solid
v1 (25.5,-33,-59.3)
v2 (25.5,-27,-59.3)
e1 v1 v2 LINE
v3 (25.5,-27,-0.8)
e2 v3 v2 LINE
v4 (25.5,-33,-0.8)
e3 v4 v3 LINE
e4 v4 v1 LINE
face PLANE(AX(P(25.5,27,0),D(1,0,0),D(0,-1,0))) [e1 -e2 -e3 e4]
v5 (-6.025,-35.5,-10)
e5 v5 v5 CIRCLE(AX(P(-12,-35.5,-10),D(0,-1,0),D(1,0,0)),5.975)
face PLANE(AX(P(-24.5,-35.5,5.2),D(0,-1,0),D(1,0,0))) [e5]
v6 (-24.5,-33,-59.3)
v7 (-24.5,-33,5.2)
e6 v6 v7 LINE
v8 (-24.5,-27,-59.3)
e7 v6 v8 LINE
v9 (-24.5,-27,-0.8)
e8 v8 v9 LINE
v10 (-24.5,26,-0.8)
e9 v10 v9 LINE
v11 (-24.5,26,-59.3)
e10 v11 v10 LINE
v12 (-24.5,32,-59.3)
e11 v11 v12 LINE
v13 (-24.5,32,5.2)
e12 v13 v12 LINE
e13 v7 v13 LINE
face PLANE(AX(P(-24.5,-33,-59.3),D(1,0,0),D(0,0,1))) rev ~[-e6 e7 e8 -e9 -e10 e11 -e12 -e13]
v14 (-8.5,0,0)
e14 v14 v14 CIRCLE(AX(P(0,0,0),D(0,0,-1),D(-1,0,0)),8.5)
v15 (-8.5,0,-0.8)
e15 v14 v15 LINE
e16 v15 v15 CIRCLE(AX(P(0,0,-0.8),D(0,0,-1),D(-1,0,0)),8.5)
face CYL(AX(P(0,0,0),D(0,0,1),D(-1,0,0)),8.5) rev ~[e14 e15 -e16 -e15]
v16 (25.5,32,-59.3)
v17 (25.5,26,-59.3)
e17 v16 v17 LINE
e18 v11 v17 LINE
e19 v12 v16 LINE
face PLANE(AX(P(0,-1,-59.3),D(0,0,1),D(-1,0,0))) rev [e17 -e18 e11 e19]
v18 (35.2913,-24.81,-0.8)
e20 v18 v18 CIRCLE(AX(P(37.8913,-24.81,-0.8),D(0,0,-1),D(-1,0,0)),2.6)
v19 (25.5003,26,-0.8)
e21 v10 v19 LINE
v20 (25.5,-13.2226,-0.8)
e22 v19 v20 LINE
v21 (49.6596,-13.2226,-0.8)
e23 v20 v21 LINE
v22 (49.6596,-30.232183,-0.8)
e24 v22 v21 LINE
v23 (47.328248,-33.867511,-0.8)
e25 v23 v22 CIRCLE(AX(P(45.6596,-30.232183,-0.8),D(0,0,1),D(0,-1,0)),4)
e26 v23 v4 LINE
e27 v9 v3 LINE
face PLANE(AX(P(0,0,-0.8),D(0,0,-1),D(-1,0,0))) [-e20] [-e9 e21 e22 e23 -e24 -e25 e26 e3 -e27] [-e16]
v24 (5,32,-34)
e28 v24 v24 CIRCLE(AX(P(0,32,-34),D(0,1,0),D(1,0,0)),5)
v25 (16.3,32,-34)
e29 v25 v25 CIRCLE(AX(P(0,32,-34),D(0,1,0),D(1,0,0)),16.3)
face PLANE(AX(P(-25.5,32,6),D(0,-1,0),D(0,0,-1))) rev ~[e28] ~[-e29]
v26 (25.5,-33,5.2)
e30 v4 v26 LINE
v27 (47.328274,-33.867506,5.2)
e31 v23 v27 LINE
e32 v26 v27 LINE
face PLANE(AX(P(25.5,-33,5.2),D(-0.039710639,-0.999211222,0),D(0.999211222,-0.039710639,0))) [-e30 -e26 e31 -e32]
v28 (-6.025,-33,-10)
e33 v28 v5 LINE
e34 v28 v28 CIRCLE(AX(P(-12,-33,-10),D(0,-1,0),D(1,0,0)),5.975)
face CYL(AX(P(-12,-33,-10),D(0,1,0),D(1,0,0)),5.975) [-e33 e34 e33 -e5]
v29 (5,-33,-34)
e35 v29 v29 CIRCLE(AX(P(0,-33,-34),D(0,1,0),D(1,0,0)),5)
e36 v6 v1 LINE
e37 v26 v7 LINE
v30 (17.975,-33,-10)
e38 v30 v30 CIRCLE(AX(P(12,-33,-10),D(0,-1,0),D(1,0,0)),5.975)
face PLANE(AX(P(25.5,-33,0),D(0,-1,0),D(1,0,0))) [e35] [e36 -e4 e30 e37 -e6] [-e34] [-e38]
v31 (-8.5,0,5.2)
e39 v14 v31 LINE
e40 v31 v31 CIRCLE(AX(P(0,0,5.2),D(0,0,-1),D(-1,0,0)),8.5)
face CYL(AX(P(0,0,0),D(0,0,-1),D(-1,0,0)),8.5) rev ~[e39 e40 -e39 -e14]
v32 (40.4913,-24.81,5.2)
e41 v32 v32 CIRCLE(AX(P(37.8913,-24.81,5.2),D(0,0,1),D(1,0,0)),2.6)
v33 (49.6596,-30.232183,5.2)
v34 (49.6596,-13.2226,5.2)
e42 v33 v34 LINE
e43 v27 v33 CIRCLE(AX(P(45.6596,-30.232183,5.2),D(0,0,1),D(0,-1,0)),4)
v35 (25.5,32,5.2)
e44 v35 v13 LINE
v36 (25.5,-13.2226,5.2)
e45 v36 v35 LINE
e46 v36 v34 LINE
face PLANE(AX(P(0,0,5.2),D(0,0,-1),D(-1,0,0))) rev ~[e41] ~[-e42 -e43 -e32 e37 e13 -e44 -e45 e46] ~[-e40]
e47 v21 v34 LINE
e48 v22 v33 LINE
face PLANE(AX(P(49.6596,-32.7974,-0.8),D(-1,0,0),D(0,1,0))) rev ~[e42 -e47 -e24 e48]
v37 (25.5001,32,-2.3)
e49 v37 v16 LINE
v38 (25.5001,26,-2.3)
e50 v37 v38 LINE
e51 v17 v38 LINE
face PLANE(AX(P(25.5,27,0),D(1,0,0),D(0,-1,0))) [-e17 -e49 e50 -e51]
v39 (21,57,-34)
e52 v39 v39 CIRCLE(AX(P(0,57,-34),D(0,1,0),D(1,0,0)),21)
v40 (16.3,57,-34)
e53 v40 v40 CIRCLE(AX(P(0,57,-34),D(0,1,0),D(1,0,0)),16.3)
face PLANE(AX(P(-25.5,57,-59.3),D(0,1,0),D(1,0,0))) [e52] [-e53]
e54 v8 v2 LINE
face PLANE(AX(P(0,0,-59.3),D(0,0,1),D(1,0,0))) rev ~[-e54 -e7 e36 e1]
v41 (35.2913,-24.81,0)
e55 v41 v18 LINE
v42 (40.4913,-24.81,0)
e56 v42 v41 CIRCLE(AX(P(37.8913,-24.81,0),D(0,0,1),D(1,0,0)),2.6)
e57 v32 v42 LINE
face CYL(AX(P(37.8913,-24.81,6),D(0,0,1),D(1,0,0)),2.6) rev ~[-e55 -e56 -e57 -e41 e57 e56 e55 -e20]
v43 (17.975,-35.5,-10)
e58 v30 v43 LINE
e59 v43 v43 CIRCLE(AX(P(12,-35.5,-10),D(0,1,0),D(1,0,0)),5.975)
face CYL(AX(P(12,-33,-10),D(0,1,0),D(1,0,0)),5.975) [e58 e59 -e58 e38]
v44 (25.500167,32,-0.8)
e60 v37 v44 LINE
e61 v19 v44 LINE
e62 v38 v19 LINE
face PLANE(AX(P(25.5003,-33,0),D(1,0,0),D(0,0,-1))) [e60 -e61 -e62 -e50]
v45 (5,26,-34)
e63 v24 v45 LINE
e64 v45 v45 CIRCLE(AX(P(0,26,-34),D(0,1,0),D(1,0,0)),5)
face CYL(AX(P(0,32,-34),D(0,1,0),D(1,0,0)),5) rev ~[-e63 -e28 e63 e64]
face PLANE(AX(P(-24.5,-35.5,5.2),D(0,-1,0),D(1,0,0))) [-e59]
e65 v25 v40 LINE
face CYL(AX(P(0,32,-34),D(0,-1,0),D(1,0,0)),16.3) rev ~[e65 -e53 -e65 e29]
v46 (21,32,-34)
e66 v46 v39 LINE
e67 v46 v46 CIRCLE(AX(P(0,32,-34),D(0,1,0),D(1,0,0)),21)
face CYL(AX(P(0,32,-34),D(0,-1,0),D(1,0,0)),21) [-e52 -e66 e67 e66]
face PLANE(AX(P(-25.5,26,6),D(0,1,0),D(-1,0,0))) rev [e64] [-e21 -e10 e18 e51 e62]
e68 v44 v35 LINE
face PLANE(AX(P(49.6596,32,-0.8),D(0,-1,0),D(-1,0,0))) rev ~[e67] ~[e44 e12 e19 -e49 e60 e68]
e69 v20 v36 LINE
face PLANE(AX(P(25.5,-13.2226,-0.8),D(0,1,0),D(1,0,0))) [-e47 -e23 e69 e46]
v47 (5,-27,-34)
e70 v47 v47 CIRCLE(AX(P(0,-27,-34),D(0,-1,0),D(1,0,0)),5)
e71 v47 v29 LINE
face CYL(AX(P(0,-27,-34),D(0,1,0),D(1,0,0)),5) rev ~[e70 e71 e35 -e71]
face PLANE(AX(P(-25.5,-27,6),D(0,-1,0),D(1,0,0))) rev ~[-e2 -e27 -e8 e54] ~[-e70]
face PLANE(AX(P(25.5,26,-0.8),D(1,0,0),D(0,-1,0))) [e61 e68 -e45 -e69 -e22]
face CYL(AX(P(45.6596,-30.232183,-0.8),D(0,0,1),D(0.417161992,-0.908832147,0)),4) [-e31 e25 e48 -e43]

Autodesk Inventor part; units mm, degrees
sketch "Sketch1" plane through (0, 0, 0) normal (0, 0, 1) x (1, 0, 0)
  line L0 (25.5, -27) -> (-25.5, -27)
  line L1 (-25.5, -27) -> (-25.5, 27)
  line L2 (-25.5, 27) -> (25.5, 27)
  line L3 (25.5, 27) -> (25.5, -27)
  line L4 (25.5, -27) -> (-25.5, 27) construction
  line L5 (-25.5, -27) -> (25.5, 27) construction
  point P0 (0, 0)
  dimension "d0" = 51
  dimension "d1" = 54
extrude "Extrusion1" add sketch "Sketch1" along normal blind 6
sketch "Sketch2" plane through (0, 0, 6) normal (0, 0, 1) x (1, 0, 0)
  circle A0 centre (0, 0) radius 15
  dimension "d4" = 30
sketch "Sketch4" plane through (0, 0, 6) normal (0, 0, 1) x (1, 0, 0)
  line L0 (-25.5, 27) -> (26.5, 27)
  line L1 (-25.5, -27) -> (25.5, -27) projected
  line L2 (25.5, -27) -> (-25.5, -27)
  line L3 (-25.5, -27) -> (-25.5, -33)
  line L4 (-25.5, -33) -> (25.5, -33)
  line L5 (25.5, -33) -> (25.5, -27)
  point P0 (0, 0)
  dimension "d109" = 51
  dimension "d110" = 6
extrude "Extrusion4" add sketch "Sketch4" against normal blind 65.3
ref_plane "Plano de trabajo8" through (25.5, -33.8, -42) normal (1, 0, 0) x (0, 0, -1)
ref_plane "Work Plane9" through (-10.5, -27, -57) normal (0, 1, 0) x (1, 0, 0)
sketch "Sketch25" plane through (-10.5, -27, -57) normal (0, 1, 0) x (1, 0, 0)
  line L0 (0, 0) -> (21, 0) projected
  line L1 (10.5, 0) -> (10.5, -23)
  circle A0 centre (10.5, -23) radius 5
  line L2 (10.5, -23) -> (10.5, -63)
  line L3 (36, -63) -> (-15, -63) projected
  point P0 (10.5, -57)
  dimension "d111" = 23
  dimension "d112" = 10
extrude "Extrusion22" cut sketch "Sketch25" against normal blind 68
ref_plane "Work Plane7" through (-10.5, -0.5, -57) normal (0, 1, 0) x (1, 0, 0)
mirror "Mirror2" about plane through (-10.5, -0.5, -57) normal (0, 1, 0) of "Extrusion4"
extrude "Extrusión28" cut sketch "Sketch2" against normal blind 10
ref_plane "Work Plane10" through (25.5, -34, -42) normal (1, 0, 0) x (0, 0, -1)
ref_plane "Work Plane11" through (-25.5, -87, 1.3) normal (0, 1, 0) x (1, 0, 0)
sketch "Sketch37" plane through (-25.5, 32, 6) normal (0, 1, 0) x (1, 0, 0)
  circle A0 centre (25.5, 40) radius 5 projected
  point P0 (25.5, 6)
extrude "Extrusion33" cut sketch "Sketch37" against normal blind 68
sketch "Sketch43" plane through (0, 0, 6) normal (0, 0, 1) x (1, 0, 0)
  circle A0 centre (0, 0) radius 10.4895
  circle A1 centre (0, 0) radius 15 projected
  circle A2 centre (0, 0) radius 5
  dimension "d182" = 10
extrude "Extrusion40" add sketch "Sketch43" against normal blind 8.3 contours A0 | A1
sketch "Boceto48" plane through (-25.5, -33, 6) normal (0, -1, 0) x (1, 0, 0)
  point P0 (25.5, -6)
sketch "Boceto49" plane through (-25.5, -33, 6) normal (0, -1, 0) x (1, 0, 0)
  point P0 (25.5, -6)
sketch "Boceto50" plane through (25.5, 26, -59.3) normal (0, 0, -1) x (-1, 0, 0)
  point P0 (25.5, -26)
sketch "Boceto77" plane through (0, 0, 6) normal (0, 0, 1) x (1, 0, 0)
  point P0 (0, 0)
sketch "Boceto84" plane through (25.5, -33, -59.3) normal (1, 0, 0) x (0, 0, -1)
  line L0 (-65.3, 0) -> (-65.3, 65) projected
  line L1 (-65.3, 0) -> (-65.3, 32.3804)
  line L2 (-65.3, 32.3804) -> (-80.5662, 32.3804)
  line L3 (-80.5662, 32.3804) -> (-80.5662, -6.9517)
  line L4 (-80.5662, -6.9517) -> (-65.3, -6.9517)
  line L5 (-65.3, -6.9517) -> (-65.3, 0)
  point P0 (-59.3, 33)
  point P1 (-65.3, 66.9563)
  point P2 (-65.3, 65.9563)
extrude "Extrusión80" cut sketch "Boceto84" along normal mid plane 100
sketch "Boceto85" plane through (0, 0, 0) normal (0, 0, -1) x (-1, 0, 0)
  line L0 (-25.5, -33) -> (-25.5, -4.0448)
  line L1 (-25.5, -27) -> (-25.5, 26) projected
  line L2 (-25.5, -4.0448) -> (-53.9802, -4.6672)
  line L3 (-53.9802, -4.6672) -> (-54.6281, -33.6366)
  line L4 (-54.6281, -33.6366) -> (-25.5, -33)
  point P0 (0, 0)
  point P1 (-25.5, -13.7947)
extrude "Extrusión81" cut sketch "Boceto85" along normal mid plane 100
sketch "Boceto90" plane through (0, 0, 6) normal (0, 0, 1) x (1, 0, 0)
  circle A0 centre (0, 0) radius 5.2249
  circle A1 centre (0, 0) radius 14.4421
extrude "Extrusión86" add sketch "Boceto90" along normal blind 4.7
fillet "Empalme20" radius 2 1 edges at (-14.4421, 0, 6)
sketch "Boceto91" plane through (0, 0, 0) normal (0, 0, -1) x (-1, 0, 0)
  point P0 (0, 0)
sketch "Boceto92" plane through (0, 0, 0) normal (0, 0, -1) x (-1, 0, 0)
  point P0 (0, 0)
sketch "Boceto93" plane through (0, 0, 0) normal (0, 0, -1) x (-1, 0, 0)
  line L0 (-25.5, -27) -> (-25.5, 26) projected
  line L1 (-25.5, 1.3668) -> (-41.5813, 1.3668)
  line L2 (-41.5813, 1.3668) -> (-41.5813, -33)
  line L3 (-25.5, -33) -> (-41.5813, -33)
  line L4 (-25.5, -33) -> (-25.5, 32.9563) projected
  line L5 (-25.5, 1.3668) -> (-25.5, -33)
  point P0 (0, 0)
extrude "Extrusión87" add sketch "Boceto93" against normal blind 8.3
sketch "Boceto94" plane through (0, 0, 6) normal (0, 0, 1) x (1, 0, 0)
  line L0 (41.5813, -33) -> (41.5813, 1.3668) projected
  line L1 (41.5813, 1.3668) -> (41.5813, 35.5236)
  line L2 (-25.5, 32.9563) -> (25.5, 32.9563) projected
  line L3 (25.5, 32.9563) -> (41.5813, 32.9563)
  line L4 (25.5, 32.9563) -> (25.5, 1.3668)
  line L5 (25.5, 1.3668) -> (41.5813, 1.3668)
  point P0 (0, 0)
extrude "Extrusión88" add sketch "Boceto94" against normal blind 8.3
sketch "Boceto95" plane through (0, 0, 6) normal (0, 0, 1) x (1, 0, 0)
  circle A0 centre (37.8913, -24.81) radius 2.6
  line L0 (35.2913, -24.81) -> (37.8913, -24.81)
  point P0 (0, 0)
  point P1 (41.5813, -33)
  dimension "d305" = 5.2
extrude "Extrusión89" cut sketch "Boceto95" against normal blind 8.3
sketch "Boceto97" plane through (-25.5, -33, -59.3) normal (-1, 0, 0) x (0, 0, 1)
  line L0 (59.3, 0) -> (67.6, 0) projected
  line L1 (67.6, 0) -> (89.1392, 0)
  line L2 (89.1392, 0) -> (89.1392, 69.8717)
  line L3 (89.1392, 69.8717) -> (67.6, 69.8717)
  line L4 (67.6, 69.8717) -> (67.6, 0)
  point P0 (59.3, 33)
extrude "Extrusión92" cut sketch "Boceto97" against normal blind 1000
sketch "Boceto98" plane through (-25.5, -33, -59.3) normal (-1, 0, 0) x (0, 0, 1)
  line L0 (59.3, 59) -> (59.3, 6) projected
  line L1 (59.3, 59) -> (58.3, 59) projected
  line L2 (59.3, 6) -> (59.3, 59)
  line L3 (59.3, 59) -> (56.1979, 59)
  line L4 (59.3, 59) -> (0, 59) projected
  line L5 (56.1979, 59) -> (56.1979, 6)
  line L6 (59.3, 6) -> (0, 6) projected
  line L7 (56.1979, 6) -> (59.3, 6)
  line L8 (65.3, 65) -> (0, 65) projected
  line L9 (56.1979, 65) -> (56.1979, 67.4992)
  line L10 (56.1979, 67.4992) -> (67.7631, 67.4992)
  line L11 (67.7631, 67.4992) -> (76.364, 67.4992)
  line L12 (76.364, 67.4992) -> (76.364, -7.6447)
  line L13 (65.3, 0) -> (65.3, 34.3668) projected
  line L14 (65.3, 0) -> (65.3, -7.6447)
  line L15 (65.3, -7.6447) -> (76.364, -7.6447)
  line L16 (65.3, 0) -> (65.3, 65)
  line L17 (65.3, 0) -> (65.3, 65) projected
  line L18 (56.1979, 65) -> (65.3, 65)
  point P0 (59.3, 33)
  point P1 (59.3, 51.8098)
  point P2 (58.3, 65)
  point P3 (65.3, 65.9563)
  point P4 (59.3, 51.8098)
  point P5 (58.3, 65)
  point P6 (65.3, 34.3668)
extrude "Extrusión93" cut sketch "Boceto98" along normal mid plane 1000
sketch "Boceto99" plane through (41.5813, -33, 0) normal (1, 0, 0) x (0, 0, -1)
  line L0 (0, 58.9816) -> (2.3, 58.9816)
  line L1 (2.3, 65) -> (2.3, 59) projected
  line L2 (2.3, 58.9816) -> (2.3, 65)
  line L3 (2.3, 65) -> (2.3, 58.9816)
  line L4 (2.3, 65) -> (0, 65)
  line L5 (-6, 65) -> (59.3, 65) projected
  line L6 (0, 58.9816) -> (0, 65)
  point P0 (0, 33)
extrude "Extrusión94" cut sketch "Boceto99" against normal blind 16.081
sketch "Boceto100" plane through (25.5, 26, -59.3) normal (0, 0, -1) x (-1, 0, 0)
  line L0 (-16.0813, 6) -> (-0.0003, 6) projected
  line L1 (0, 0) -> (-16.0813, 0)
  line L2 (-16.0813, 0) -> (-16.0813, 6)
  line L3 (-16.0813, 6) -> (0, 6)
  line L4 (0, 6) -> (0, 0)
  point P0 (25.5, -26)
  point P1 (-0.0003, 6)
extrude "Extrusión95" cut sketch "Boceto100" against normal blind 59.3
sketch "Boceto101" plane through (0, 0, 0) normal (0, 0, -1) x (-1, 0, 0)
  circle A0 centre (0, 0) radius 8.5
  dimension "d322" = 17
extrude "Extrusión96" cut sketch "Boceto101" against normal blind 59.3
sketch "Boceto102" plane through (-25.5, 32, -59.3) normal (0, 1, 0) x (1, 0, 0)
  circle A0 centre (25.5, -25.3) radius 5 projected
  circle A1 centre (25.5, -25.3) radius 16.3
  circle A2 centre (25.5, -25.3) radius 21
  point P0 (25.5, -59.3)
  dimension "d325" = 32.6
  dimension "d326" = 42
extrude "Extrusión97" add sketch "Boceto102" along normal blind 25 contours A2
sketch "Boceto103" plane through (-25.5, -27, -59.3) normal (0, 1, 0) x (1, 0, 0)
  point P0 (25.5, -59.3)
sketch "Boceto104" plane through (0, 0, 6) normal (0, 0, 1) x (1, 0, 0)
  line L0 (-25.5, -33) -> (-25.5, 32) projected
  line L1 (41.5813, 32) -> (41.5813, -33) projected
  line L2 (-25.5, 32) -> (41.5813, 32)
  line L3 (41.5813, 32) -> (41.5813, -33)
  line L4 (41.5813, -33) -> (-25.5, -33)
  line L5 (-25.5, -33) -> (-25.5, 32)
  point P0 (0, 0)
extrude "Extrusión98" cut sketch "Boceto104" against normal blind 0.8
sketch "Boceto105" plane through (0, 0, 0) normal (0, 0, -1) x (-1, 0, 0)
  line L0 (-25.5, -33) -> (25.5, -33) projected
  line L1 (-41.5813, 32) -> (25.5, 32)
  line L2 (25.5, 32) -> (25.5, -33)
  line L3 (25.5, -33) -> (-41.5813, -33)
  line L4 (-41.5813, -33) -> (-41.5813, 32)
  circle A0 centre (-37.8913, -24.81) radius 2.6 projected
  circle A1 centre (-37.8913, -24.81) radius 2.6
  circle A2 centre (0, 0) radius 8.5
extrude "Extrusión99" add sketch "Boceto105" along normal blind 0.8
sketch "Boceto106" plane through (-25.5, -33, -59.3) normal (0, -1, 0) x (1, 0, 0)
  line L0 (0, 0) -> (51, 0) projected
  line L1 (67.0813, 64.5) -> (0, 64.5) projected
  line L2 (0, 0) -> (1, 0)
  line L3 (1, 0) -> (1, 64.5)
  line L4 (1, 64.5) -> (0, 64.5)
  line L5 (0, 64.5) -> (0, 0)
  point P0 (25.5, 59.3)
  point P1 (0, 64.5)
  point P2 (1, 0)
  dimension "d333" = 1
extrude "Extrusión100" cut sketch "Boceto106" against normal blind 1000
sketch "Boceto107" plane through (0, 0, -0.8) normal (0, 0, -1) x (-1, 0, 0)
  line L0 (-25.5, -33) -> (-25.5, -38.9196)
  line L1 (-25.5, -38.9196) -> (-33.0828, -52.767)
  line L2 (-33.0828, -52.767) -> (-34.3078, -45.7968) construction
  line L3 (-41.5813, -33) -> (24.5, -33) projected
  spline S0 degree 3 poles (-33.0828, -52.767) (-34.3078, -45.7968) (-36.0426, -41.6296) (-38.17, -38.0712) knots 1 1 1 1 1.670244 1.670244 1.670244 1.670244
  line L4 (-41.5813, 32) -> (-41.5813, -33) projected
  line L5 (-37.8729, -38.2076) -> (-46.4829, -34.2556)
  line L6 (-46.4829, -34.2556) -> (-46.4829, 32)
  line L7 (-46.4829, 32) -> (-41.5813, 32)
  line L8 (-34.3078, -45.7968) -> (-36.0426, -41.6296) construction
  line L9 (-36.0426, -41.6296) -> (-38.17, -38.0712) construction
  point P0 (0, 0)
extrude "Extrusión101" add sketch "Boceto107" against normal blind 6
fillet "Empalme21" radius 2 2 edges at (38.17, -38.0712, 2.2) (46.4829, -34.2556, 2.2)
sketch "Boceto108" plane through (-24.5, -33, 5.2) normal (0, -1, 0) x (1, 0, 0)
  circle A0 centre (24.5, -39.2) radius 5 projected
  line L0 (24.5, -39.2) -> (24.5, -15.2)
  line L1 (50, -6) -> (0, -6) projected
  line L2 (24.5, -15.2) -> (32.2045, -6)
  line L3 (32.2045, -6) -> (24.5, -15.2)
  line L4 (24.5, -15.2) -> (36.5, -15.2)
  line L5 (36.5, -15.2) -> (12.5, -15.2)
  circle A1 centre (36.5, -15.2) radius 5.975
  circle A2 centre (12.5, -15.2) radius 5.975
  point P0 (24.5, -5.2)
  dimension "d340" = 24
  dimension "d341" = 12
  dimension "d342" = 12
  dimension "d343" = 24
  dimension "d344" = 11.95
  dimension "d345" = 11.95
extrude "Extrusión102" add sketch "Boceto108" along normal blind 2.5 contours A1 | A2
sketch "Boceto109" plane through (0, 0, -0.8) normal (0, 0, -1) x (-1, 0, 0)
  line L0 (-45.3172, -34.7906) -> (-38.7421, -37.8086) projected
  line L1 (-45.3172, -34.7906) -> (-49.6596, -32.7974)
  line L2 (-49.6596, -32.7974) -> (-49.6596, 32)
  line L3 (-46.4829, 32) -> (-46.4829, -32.9729) projected
  line L4 (-49.6596, 32) -> (-46.4829, 32)
  arc A0 (-46.4829, -32.9729) -> (-45.3172, -34.7906) centre (-44.4829, -32.9729) ccw projected
  line L5 (-46.4829, 32) -> (-45.3172, -34.7906)
  point P0 (0, 0)
extrude "Extrusión103" add sketch "Boceto109" against normal blind 6 contours L1 L2 L4 L3 A0
fillet "Empalme23" radius 4 2 edges at (49.6596, -32.7974, 2.2) (49.6596, 32, 2.2)
sketch "Boceto110" plane through (0, 0, 5.2) normal (0, 0, 1) x (1, 0, 0)
  line L0 (33.0828, -52.767) -> (25.5, -38.9196) projected
  line L1 (25.5, -38.9196) -> (37.9157, -38.9196)
  line L2 (37.9157, -38.9196) -> (33.0828, -52.767)
  line L3 (33.0828, -52.767) -> (25.5, -38.9196)
  point P0 (0, 0)
extrude "Extrusión104" cut sketch "Boceto110" against normal blind 10
sketch "Sketch111" plane through (0, 0, 5.2) normal (0, 0, 1) x (1, 0, 0)
  line L0 (25.5, -33) -> (25.5, -38.9196) projected
  line L1 (38.7421, -37.8086) -> (47.3283, -33.8675) projected
  line L2 (25.5, -33) -> (47.3283, -33.8675)
  line L3 (37.6774, -38.9196) -> (25.5, -38.9196) projected
  line L4 (25.5, -38.9196) -> (37.6774, -38.9196)
  line L5 (37.6774, -38.9196) -> (38.7421, -37.8086)
  point P0 (0, 0)
extrude "Extrusion105" cut sketch "Sketch111" against normal blind 10
sketch "Sketch114" plane through (0, 0, -0.8) normal (0, 0, -1) x (-1, 0, 0)
  line L0 (-25.5, 32) -> (-25.5, 26) projected
  line L1 (-25.5, 26) -> (-25.5, 32)
  line L2 (-25.5, 32) -> (-25.5, -13.2226)
  line L3 (-25.5, -13.2226) -> (-49.6596, -13.2226)
  line L4 (-49.6596, -30.2322) -> (-49.6596, 28) projected
  line L5 (-49.6596, 28) -> (-49.6596, -30.2322) projected
  line L6 (-49.6596, -13.2226) -> (-49.6596, 28)
  line L7 (-25.5, 32) -> (-45.6596, 32) projected
  arc A0 (-45.6596, 32) -> (-49.6596, 28) centre (-45.6596, 28) ccw projected
  arc A1 (-45.6596, 32) -> (-49.6596, 28) centre (-45.6596, 28) ccw
  line L8 (-45.6596, 32) -> (-25.5, 32)
  point P0 (0, 0)
extrude "Extrusion108" cut sketch "Sketch114" against normal blind 6
sketch "Sketch115" plane through (0, 0, -59.3) normal (0, 0, -1) x (-1, 0, 0)
  line L0 (-50.9952, -38.1245) -> (29.0048, -38.1245)
  line L1 (29.0048, -38.1245) -> (29.0048, 81.8755)
  line L2 (29.0048, 81.8755) -> (-50.9952, 81.8755)
  line L3 (-50.9952, 81.8755) -> (-50.9952, -38.1245)
  point P0 (0, 0)
  dimension "d363" = 80
  dimension "d364" = 120
ref_plane "Work Plane3" through (-10.35, 26, -57) normal (0, 1, 0) x (1, 0, 0)
properties part number "C23[i3][L]" material "Aluminum 6061"
